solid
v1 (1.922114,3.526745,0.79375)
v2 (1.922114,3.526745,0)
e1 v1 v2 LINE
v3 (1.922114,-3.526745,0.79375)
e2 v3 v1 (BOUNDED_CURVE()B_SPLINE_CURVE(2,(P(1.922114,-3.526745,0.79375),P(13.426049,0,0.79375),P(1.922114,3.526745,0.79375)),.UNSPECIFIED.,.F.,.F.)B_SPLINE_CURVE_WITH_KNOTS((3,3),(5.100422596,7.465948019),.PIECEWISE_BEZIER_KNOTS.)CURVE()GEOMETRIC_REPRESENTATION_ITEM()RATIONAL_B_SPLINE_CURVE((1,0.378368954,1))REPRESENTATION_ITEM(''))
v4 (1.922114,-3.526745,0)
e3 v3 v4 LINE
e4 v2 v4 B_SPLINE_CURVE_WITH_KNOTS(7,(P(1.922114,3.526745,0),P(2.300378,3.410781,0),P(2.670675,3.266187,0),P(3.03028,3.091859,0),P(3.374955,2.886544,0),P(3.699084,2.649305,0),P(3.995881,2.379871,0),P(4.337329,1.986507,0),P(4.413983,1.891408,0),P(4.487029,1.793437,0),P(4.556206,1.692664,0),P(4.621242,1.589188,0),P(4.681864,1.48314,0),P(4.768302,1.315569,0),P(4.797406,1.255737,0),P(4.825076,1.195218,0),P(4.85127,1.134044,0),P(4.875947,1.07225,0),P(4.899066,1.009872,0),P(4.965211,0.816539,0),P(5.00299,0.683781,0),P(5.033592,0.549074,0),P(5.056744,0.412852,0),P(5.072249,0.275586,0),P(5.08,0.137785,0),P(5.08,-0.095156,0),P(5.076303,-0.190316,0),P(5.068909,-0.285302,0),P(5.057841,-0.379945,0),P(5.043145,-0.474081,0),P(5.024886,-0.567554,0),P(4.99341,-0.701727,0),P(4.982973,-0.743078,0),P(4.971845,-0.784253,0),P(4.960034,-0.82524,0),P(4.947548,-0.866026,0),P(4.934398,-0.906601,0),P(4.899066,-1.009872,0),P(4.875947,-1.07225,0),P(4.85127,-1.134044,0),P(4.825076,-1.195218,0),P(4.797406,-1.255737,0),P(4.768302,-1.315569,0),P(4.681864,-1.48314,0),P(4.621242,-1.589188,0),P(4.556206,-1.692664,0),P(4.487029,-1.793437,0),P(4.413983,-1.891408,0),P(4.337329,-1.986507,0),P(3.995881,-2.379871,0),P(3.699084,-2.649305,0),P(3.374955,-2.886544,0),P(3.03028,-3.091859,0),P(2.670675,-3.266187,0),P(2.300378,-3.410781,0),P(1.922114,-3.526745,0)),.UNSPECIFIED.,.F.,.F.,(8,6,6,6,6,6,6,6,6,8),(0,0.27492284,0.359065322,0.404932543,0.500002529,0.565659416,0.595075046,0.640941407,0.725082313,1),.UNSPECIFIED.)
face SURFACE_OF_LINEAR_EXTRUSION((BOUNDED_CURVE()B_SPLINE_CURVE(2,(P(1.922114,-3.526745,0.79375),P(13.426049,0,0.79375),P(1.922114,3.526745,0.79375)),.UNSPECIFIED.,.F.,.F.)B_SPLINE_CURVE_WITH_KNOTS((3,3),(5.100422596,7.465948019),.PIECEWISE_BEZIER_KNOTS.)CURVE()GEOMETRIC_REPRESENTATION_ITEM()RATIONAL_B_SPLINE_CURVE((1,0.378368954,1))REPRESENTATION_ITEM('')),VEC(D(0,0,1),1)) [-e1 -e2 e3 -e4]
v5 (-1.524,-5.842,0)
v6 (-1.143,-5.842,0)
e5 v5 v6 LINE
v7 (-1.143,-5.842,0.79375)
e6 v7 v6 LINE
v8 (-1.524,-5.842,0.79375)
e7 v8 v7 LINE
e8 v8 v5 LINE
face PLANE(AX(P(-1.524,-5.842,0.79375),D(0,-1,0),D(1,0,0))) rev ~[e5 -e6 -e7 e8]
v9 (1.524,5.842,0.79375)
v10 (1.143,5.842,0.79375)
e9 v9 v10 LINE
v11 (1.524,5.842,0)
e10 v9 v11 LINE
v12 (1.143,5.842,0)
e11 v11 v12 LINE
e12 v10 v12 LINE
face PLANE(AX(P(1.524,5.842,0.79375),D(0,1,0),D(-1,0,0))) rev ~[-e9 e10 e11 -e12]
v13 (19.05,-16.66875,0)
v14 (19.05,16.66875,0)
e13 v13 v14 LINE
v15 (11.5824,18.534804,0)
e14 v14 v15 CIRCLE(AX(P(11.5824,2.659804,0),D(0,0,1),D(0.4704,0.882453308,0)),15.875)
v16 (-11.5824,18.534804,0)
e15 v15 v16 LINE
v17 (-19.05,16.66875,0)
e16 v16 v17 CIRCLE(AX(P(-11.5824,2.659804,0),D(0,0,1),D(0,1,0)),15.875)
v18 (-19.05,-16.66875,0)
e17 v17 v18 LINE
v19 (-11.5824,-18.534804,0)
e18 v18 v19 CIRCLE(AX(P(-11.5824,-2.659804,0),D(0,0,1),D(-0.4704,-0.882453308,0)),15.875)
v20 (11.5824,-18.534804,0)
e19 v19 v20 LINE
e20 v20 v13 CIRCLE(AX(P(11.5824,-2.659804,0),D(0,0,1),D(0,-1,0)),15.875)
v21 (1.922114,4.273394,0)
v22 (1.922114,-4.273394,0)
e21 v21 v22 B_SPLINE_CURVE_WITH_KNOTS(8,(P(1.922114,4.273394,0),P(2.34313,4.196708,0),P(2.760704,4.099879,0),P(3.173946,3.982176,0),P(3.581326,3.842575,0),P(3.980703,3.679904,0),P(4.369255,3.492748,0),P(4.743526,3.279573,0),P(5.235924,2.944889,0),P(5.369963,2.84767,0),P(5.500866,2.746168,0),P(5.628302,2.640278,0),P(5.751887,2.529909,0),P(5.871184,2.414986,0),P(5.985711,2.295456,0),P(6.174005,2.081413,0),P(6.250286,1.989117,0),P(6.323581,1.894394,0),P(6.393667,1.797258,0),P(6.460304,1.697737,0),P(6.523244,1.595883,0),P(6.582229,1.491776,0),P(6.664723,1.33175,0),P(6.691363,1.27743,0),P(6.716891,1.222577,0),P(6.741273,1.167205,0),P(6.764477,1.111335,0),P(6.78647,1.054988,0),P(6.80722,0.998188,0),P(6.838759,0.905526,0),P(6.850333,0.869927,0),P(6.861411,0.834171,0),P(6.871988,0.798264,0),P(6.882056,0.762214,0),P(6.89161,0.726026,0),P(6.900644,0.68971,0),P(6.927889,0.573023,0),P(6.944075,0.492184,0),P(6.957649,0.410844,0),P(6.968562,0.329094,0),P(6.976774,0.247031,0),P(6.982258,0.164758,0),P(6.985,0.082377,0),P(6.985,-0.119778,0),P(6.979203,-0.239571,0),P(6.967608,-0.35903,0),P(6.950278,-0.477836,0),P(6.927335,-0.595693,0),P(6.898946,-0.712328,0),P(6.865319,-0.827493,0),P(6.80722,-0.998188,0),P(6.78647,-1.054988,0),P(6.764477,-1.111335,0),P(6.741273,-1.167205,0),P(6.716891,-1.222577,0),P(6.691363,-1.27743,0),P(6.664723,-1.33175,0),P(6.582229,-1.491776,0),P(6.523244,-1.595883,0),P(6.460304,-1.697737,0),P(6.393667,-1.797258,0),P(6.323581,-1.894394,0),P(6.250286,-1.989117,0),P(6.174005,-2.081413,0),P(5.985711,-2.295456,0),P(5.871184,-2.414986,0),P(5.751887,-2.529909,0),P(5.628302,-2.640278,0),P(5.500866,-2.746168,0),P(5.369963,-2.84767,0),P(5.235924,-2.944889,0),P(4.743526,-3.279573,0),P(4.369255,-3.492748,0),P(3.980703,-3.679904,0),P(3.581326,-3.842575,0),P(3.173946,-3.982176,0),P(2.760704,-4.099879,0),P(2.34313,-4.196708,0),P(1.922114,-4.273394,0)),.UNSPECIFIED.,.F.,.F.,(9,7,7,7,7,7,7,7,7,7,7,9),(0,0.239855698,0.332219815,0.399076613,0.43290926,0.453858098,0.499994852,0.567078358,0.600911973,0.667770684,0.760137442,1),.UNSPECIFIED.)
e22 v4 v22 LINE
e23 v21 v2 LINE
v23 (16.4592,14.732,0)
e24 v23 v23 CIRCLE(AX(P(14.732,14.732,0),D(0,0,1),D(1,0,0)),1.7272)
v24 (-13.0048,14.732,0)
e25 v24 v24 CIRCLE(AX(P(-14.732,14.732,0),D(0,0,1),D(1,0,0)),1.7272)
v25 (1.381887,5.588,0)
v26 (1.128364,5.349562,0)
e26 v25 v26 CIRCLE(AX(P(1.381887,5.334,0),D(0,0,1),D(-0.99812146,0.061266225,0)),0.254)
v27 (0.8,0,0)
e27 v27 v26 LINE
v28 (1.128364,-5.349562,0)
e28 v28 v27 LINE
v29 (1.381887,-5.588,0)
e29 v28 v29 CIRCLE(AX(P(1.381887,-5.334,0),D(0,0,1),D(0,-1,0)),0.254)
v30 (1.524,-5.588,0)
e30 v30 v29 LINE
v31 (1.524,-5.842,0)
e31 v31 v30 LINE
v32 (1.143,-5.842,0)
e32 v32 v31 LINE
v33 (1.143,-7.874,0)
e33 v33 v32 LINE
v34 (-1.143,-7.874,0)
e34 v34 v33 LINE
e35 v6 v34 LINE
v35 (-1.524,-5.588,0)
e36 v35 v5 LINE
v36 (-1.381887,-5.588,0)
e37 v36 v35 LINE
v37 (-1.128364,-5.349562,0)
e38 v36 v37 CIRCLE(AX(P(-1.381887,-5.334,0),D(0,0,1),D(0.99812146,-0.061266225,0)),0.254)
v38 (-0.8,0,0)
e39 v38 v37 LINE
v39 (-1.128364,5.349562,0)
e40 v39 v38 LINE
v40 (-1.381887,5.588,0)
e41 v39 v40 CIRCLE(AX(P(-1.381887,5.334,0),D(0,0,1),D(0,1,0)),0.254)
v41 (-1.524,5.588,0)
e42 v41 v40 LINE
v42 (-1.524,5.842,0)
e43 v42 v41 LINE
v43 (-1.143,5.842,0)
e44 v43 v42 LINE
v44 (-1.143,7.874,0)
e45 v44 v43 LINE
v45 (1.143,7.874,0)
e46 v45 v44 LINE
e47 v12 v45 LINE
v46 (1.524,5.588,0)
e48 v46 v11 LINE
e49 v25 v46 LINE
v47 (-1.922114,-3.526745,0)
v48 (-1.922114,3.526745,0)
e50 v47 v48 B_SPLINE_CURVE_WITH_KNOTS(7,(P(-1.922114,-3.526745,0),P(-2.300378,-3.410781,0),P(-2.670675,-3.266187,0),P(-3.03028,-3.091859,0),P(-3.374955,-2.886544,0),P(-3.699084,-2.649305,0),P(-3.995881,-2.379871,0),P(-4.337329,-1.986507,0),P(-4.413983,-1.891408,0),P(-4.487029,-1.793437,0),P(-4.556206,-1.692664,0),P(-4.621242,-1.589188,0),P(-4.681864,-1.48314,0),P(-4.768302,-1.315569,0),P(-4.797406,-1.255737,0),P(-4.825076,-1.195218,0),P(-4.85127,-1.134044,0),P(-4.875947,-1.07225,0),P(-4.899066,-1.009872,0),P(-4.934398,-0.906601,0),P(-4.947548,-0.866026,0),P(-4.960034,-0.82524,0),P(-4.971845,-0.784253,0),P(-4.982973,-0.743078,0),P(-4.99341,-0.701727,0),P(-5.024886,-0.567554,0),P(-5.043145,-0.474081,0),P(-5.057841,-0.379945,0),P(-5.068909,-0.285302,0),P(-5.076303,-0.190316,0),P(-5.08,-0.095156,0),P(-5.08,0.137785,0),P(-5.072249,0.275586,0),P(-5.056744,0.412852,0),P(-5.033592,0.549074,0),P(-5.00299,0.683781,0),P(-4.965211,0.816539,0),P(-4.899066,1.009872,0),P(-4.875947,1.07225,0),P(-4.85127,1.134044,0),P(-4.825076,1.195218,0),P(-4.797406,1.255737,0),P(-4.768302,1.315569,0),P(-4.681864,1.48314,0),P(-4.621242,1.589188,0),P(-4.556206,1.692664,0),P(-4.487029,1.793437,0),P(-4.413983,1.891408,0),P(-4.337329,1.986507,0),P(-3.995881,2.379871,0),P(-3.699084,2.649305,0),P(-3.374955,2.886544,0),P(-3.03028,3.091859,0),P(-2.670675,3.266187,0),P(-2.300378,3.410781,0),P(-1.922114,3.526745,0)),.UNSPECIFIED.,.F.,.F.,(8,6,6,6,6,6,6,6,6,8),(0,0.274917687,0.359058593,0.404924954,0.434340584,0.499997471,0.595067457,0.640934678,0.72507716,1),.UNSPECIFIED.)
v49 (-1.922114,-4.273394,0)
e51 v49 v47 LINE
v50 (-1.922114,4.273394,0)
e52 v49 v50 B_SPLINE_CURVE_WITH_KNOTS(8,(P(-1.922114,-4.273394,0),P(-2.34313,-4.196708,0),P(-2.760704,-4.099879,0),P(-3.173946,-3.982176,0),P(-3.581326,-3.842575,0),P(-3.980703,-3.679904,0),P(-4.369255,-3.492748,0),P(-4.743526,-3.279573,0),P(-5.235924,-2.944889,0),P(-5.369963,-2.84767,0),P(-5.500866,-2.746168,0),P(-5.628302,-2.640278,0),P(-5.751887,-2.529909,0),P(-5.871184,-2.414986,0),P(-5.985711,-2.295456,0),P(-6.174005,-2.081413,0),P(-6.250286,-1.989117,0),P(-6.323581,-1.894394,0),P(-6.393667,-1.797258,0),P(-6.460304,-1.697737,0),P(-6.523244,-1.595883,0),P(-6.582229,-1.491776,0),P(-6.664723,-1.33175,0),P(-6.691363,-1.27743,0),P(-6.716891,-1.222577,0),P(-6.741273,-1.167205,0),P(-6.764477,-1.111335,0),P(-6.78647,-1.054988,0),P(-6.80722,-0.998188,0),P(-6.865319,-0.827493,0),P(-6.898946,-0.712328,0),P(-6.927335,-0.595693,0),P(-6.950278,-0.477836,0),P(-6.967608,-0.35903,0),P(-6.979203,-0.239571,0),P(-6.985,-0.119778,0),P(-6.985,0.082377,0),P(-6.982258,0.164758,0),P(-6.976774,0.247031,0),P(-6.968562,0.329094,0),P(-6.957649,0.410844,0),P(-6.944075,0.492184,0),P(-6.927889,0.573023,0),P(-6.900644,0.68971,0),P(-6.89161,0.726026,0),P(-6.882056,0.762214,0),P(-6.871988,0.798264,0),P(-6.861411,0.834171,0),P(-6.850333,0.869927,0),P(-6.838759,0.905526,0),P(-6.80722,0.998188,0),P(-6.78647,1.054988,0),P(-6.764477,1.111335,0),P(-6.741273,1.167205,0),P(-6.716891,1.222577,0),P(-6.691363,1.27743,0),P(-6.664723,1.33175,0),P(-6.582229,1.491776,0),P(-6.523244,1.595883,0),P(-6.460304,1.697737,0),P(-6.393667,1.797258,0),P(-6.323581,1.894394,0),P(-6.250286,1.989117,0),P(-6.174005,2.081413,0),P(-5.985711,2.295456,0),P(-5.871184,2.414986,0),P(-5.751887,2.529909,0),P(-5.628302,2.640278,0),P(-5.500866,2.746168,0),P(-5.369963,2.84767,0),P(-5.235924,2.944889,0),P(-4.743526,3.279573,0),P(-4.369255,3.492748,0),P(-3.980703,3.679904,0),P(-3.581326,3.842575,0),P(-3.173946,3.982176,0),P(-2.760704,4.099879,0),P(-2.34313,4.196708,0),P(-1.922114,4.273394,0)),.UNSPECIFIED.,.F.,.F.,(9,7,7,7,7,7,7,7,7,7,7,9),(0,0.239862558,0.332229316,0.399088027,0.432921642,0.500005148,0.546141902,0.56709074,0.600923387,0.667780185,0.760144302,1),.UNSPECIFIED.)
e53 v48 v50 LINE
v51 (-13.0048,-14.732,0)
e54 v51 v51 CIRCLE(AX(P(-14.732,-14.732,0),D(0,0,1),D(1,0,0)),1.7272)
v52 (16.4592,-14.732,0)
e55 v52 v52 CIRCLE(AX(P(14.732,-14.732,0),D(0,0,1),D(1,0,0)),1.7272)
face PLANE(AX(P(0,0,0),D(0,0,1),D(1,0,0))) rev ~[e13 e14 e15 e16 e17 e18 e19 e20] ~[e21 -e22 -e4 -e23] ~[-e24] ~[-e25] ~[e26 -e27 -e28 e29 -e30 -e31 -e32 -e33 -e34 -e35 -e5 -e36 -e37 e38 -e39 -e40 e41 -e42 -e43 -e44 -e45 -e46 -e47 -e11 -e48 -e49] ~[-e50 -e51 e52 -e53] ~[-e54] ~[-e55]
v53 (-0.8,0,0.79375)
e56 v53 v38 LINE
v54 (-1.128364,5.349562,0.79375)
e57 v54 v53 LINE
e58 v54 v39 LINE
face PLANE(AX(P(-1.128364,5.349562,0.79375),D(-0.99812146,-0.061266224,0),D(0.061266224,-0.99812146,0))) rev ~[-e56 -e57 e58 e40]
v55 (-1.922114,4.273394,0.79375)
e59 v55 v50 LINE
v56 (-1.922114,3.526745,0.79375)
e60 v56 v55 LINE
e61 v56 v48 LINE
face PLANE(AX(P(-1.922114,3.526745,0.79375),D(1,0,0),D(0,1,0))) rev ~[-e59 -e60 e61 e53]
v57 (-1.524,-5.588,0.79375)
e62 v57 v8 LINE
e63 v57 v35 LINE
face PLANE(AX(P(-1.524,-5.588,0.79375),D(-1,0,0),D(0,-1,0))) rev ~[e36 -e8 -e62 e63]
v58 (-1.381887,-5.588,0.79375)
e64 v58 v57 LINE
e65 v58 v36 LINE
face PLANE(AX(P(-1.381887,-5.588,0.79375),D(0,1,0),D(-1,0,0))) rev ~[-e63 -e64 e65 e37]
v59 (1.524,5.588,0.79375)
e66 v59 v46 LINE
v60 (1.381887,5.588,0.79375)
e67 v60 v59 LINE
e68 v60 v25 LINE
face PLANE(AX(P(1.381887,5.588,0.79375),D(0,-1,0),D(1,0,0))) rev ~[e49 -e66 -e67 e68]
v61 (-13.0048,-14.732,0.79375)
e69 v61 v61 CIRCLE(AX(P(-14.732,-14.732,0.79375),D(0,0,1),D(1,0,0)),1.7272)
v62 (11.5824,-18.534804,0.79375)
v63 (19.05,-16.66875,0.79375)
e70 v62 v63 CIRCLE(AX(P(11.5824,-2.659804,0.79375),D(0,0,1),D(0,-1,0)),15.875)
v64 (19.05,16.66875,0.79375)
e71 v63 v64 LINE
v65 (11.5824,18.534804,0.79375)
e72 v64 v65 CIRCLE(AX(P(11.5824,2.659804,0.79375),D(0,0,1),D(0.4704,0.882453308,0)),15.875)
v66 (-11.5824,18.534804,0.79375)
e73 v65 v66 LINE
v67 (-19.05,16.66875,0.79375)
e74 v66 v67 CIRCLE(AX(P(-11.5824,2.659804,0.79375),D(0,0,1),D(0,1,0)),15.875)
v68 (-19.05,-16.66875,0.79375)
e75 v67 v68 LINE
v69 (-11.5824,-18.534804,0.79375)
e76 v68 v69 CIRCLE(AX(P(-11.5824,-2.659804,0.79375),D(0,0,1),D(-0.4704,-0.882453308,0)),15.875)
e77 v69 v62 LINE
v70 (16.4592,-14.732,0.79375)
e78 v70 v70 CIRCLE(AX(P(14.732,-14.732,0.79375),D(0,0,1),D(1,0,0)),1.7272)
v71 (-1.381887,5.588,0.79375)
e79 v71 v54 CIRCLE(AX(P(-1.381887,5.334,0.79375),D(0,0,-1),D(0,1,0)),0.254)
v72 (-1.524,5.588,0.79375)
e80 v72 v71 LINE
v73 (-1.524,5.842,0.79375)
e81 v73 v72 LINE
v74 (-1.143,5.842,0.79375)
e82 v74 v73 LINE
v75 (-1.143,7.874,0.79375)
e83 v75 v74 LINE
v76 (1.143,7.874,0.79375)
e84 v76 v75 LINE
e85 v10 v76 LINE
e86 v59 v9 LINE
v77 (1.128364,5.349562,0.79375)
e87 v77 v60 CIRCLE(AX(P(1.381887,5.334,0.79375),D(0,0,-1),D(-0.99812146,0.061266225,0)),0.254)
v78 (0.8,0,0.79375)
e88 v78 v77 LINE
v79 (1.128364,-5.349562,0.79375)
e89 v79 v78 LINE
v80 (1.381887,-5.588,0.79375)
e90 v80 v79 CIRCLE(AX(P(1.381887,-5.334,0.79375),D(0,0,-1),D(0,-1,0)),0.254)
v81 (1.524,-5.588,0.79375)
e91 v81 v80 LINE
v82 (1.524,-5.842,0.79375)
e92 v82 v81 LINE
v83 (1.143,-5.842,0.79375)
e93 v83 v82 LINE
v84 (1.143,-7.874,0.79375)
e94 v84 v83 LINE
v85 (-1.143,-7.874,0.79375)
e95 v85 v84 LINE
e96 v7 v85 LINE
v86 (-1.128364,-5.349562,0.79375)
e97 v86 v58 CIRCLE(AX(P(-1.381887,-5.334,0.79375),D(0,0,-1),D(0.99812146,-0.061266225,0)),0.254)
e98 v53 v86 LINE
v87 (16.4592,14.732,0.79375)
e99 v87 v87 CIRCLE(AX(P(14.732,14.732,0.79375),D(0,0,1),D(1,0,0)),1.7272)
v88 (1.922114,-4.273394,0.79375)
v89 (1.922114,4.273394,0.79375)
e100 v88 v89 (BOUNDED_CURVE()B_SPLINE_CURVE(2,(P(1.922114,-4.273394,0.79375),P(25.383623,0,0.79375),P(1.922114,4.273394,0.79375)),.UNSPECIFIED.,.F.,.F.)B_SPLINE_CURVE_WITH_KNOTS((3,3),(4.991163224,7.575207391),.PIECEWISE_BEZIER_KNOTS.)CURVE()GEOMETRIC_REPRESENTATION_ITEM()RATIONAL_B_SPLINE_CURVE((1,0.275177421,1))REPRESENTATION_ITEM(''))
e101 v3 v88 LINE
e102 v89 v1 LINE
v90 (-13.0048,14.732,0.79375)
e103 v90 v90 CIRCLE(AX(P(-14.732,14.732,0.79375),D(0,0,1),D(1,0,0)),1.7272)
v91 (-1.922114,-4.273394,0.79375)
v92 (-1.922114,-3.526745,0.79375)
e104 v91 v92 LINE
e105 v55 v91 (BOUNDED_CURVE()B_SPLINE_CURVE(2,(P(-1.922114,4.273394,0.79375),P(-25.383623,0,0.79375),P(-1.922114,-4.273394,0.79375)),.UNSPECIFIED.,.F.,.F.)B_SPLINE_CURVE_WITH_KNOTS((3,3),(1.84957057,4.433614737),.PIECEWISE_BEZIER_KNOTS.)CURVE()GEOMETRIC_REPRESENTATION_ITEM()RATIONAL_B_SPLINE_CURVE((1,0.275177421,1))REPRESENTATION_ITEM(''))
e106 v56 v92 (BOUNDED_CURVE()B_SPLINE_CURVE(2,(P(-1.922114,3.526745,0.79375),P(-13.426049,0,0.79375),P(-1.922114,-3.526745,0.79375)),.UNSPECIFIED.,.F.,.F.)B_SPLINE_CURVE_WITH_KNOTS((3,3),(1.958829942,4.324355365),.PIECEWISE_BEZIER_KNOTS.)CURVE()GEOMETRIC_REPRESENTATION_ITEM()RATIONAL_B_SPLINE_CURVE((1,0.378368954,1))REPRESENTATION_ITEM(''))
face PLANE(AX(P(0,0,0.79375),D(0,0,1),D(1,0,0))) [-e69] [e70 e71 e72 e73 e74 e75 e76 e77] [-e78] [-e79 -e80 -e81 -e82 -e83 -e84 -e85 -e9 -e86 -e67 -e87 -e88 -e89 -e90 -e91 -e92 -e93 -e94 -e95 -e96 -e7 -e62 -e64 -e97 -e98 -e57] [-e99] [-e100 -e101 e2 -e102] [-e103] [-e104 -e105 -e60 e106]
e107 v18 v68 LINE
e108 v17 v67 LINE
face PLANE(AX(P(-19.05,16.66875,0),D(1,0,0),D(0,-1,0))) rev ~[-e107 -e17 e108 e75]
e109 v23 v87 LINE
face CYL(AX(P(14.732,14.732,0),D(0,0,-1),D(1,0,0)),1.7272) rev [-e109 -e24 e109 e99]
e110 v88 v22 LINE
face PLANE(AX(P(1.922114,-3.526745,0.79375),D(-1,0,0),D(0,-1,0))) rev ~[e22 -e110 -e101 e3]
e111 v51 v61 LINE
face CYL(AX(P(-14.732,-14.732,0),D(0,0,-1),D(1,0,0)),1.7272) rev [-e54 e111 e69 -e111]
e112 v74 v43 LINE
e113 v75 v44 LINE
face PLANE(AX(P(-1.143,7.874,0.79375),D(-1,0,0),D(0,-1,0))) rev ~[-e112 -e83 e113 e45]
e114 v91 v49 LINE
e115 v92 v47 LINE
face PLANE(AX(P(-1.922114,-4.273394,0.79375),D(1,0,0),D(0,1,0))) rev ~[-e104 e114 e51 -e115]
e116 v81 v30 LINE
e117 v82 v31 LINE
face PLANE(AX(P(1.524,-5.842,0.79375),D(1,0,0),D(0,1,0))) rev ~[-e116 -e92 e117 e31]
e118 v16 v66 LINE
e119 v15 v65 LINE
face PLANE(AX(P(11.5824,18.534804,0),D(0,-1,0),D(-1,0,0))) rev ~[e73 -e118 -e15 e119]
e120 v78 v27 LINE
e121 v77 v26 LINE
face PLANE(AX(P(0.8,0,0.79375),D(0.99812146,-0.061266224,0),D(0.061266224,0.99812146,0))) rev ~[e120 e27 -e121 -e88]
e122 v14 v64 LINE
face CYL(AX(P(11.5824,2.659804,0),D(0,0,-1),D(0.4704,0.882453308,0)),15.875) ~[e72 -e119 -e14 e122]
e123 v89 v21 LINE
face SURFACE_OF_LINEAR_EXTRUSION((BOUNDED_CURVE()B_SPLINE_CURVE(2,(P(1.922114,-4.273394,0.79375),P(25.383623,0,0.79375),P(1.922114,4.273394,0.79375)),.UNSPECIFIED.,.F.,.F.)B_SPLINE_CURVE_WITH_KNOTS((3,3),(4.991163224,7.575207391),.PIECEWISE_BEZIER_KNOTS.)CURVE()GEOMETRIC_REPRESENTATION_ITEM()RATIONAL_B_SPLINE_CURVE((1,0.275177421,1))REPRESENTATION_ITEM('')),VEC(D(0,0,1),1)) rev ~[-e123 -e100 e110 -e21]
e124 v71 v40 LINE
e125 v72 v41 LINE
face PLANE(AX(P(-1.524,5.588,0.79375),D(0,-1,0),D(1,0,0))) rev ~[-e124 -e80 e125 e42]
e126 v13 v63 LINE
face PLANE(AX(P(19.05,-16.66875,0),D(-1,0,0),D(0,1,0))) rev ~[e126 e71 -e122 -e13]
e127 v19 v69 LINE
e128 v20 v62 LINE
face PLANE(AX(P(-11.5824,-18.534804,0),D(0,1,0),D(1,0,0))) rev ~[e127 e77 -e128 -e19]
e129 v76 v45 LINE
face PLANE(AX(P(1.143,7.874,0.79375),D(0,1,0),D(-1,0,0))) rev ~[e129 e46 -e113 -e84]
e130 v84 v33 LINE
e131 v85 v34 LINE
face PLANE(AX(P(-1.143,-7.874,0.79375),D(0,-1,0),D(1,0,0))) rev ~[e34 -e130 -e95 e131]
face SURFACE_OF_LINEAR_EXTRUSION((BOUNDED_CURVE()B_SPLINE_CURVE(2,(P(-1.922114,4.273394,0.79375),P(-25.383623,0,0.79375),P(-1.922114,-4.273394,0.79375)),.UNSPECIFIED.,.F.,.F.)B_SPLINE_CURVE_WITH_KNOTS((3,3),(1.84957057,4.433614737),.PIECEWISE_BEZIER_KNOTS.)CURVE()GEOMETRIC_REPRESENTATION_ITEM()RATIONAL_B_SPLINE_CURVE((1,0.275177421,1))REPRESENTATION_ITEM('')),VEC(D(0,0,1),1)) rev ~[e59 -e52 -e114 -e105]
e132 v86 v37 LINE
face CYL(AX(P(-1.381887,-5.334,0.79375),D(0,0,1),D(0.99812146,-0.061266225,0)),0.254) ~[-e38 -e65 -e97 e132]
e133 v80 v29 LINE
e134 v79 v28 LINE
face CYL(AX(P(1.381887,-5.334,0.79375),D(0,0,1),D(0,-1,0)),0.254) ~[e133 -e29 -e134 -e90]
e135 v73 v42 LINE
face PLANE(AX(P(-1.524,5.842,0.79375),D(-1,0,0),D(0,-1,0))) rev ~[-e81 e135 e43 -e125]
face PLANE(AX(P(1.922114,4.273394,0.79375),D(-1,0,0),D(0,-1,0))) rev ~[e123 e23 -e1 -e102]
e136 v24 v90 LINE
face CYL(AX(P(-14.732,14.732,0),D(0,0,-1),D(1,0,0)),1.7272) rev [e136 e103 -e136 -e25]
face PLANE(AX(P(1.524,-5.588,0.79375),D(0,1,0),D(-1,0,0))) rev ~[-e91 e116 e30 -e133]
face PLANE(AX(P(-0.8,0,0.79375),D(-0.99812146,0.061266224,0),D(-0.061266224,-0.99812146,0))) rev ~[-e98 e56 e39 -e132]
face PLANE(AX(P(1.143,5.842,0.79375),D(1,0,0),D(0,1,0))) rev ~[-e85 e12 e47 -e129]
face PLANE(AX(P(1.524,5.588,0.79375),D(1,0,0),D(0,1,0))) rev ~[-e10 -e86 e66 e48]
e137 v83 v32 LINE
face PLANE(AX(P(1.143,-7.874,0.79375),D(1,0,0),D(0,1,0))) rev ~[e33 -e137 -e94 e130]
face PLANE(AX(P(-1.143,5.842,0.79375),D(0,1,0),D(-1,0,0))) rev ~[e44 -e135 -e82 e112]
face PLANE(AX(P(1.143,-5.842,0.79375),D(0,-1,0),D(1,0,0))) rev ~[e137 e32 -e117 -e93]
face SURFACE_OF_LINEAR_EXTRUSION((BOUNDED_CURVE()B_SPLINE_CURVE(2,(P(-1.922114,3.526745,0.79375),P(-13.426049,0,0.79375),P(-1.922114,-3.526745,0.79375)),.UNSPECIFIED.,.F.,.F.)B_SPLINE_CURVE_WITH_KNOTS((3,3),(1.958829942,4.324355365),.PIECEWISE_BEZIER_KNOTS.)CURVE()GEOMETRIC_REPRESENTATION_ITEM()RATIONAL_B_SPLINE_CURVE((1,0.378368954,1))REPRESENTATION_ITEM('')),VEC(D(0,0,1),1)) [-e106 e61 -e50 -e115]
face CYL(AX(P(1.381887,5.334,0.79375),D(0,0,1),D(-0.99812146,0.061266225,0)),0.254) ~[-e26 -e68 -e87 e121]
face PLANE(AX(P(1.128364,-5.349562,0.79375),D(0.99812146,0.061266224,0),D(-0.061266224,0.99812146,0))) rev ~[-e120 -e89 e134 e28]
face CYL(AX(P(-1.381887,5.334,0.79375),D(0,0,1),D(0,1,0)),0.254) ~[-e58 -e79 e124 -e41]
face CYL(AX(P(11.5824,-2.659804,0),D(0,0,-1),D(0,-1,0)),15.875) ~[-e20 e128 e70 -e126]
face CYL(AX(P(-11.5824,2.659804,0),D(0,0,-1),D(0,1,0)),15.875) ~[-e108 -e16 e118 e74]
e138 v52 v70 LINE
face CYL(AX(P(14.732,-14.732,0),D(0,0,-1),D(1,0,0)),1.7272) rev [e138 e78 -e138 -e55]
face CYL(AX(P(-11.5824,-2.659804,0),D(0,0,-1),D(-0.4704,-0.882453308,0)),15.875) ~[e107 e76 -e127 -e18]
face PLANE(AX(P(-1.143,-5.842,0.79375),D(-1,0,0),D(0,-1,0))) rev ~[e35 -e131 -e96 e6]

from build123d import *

# Parameters (mm, degrees)
F0_R     = 1.7272
F1_DEPTH = 0.79375
F3_DEPTH = 25.4


# Not quite as in the source:
# - a feature names something its author has since deleted; it is built from what else it names


with BuildPart() as f1:
    # F0 (on Top) → F1 (new body)
    with BuildSketch(Plane.XY):
        with BuildLine():
            Line((-19.05, 16.66875), (-19.05, 0))
            Line((-19.05, 0), (-19.05, -16.66875))
            ThreePointArc((-19.05, -16.66875), (-15.4310103444, -18.0612265152), (-11.5824, -18.5348037427))
            Line((-11.5824, -18.5348037427), (0, -18.5348037427))
            Line((0, -18.5348037427), (11.5824, -18.5348037427))
            ThreePointArc((11.5824, -18.5348037427), (15.4310103444, -18.0612265152), (19.05, -16.66875))
            Line((19.05, -16.66875), (19.05, 0))
            Line((19.05, 0), (19.05, 16.66875))
            ThreePointArc((19.05, 16.66875), (15.4310103444, 18.0612265152), (11.5824, 18.5348037427))
            Line((11.5824, 18.5348037427), (0, 18.5348037427))
            Line((0, 18.5348037427), (-11.5824, 18.5348037427))
            ThreePointArc((-11.5824, 18.5348037427), (-15.4310103444, 18.0612265152), (-19.05, 16.66875))
        make_face()
        with Locations((-14.732, -14.732)):
            Circle(F0_R, mode=Mode.SUBTRACT)
        with Locations((14.732, -14.732)):
            Circle(F0_R, mode=Mode.SUBTRACT)
        with Locations((-14.732, 14.732)):
            Circle(F0_R, mode=Mode.SUBTRACT)
        with Locations((14.732, 14.732)):
            Circle(F0_R, mode=Mode.SUBTRACT)
    extrude(amount=F1_DEPTH)

    # F2 (on face) → F3 (cut)
    with BuildSketch(Plane.XY.offset(0.79375)):
        with BuildLine():
            Line((-1.381887138, -5.588), (-1.524, -5.588))
            Line((-1.524, -5.588), (-1.524, -5.842))
            Line((-1.524, -5.842), (-1.143, -5.842))
            Line((-1.143, -5.842), (-1.143, -7.874))
            Line((-1.143, -7.874), (0, -7.874))
            Line((0, -7.874), (1.143, -7.874))
            Line((1.143, -7.874), (1.143, -5.842))
            Line((1.143, -5.842), (1.524, -5.842))
            Line((1.524, -5.842), (1.524, -5.588))
            Line((1.524, -5.588), (1.381887138, -5.588))
            ThreePointArc((1.381887138, -5.588), (1.2078708338, -5.5190252033), (1.128364287, -5.349561621))
            Line((1.128364287, -5.349561621), (0.8, 0))
            Line((0.8, 0), (1.128364287, 5.349561621))
            ThreePointArc((1.128364287, 5.349561621), (1.2078708338, 5.5190252033), (1.381887138, 5.588))
            Line((1.381887138, 5.588), (1.524, 5.588))
            Line((1.524, 5.588), (1.524, 5.842))
            Line((1.524, 5.842), (1.143, 5.842))
            Line((1.143, 5.842), (1.143, 7.874))
            Line((1.143, 7.874), (0, 7.874))
            Line((0, 7.874), (-1.143, 7.874))
            Line((-1.143, 7.874), (-1.143, 5.842))
            Line((-1.143, 5.842), (-1.524, 5.842))
            Line((-1.524, 5.842), (-1.524, 5.588))
            Line((-1.524, 5.588), (-1.381887138, 5.588))
            ThreePointArc((-1.381887138, 5.588), (-1.2078708338, 5.5190252033), (-1.128364287, 5.349561621))
            Line((-1.128364287, 5.349561621), (-0.8, 0))
            Line((-0.8, 0), (-1.128364287, -5.349561621))
            ThreePointArc((-1.128364287, -5.349561621), (-1.2078708338, -5.5190252033), (-1.381887138, -5.588))
        make_face()
        with BuildLine():
            add(Edge.make_bspline(
                [(-1.922114287, 3.5267450469), (-13.4260486871, 0), (-1.922114287, -3.5267450469)],
                knots=[1.958829942, 1.958829942, 1.958829942, 4.3243553652, 4.3243553652, 4.3243553652], degree=2, weights=[1, 0.3783689541, 1]))
            Line((-1.922114287, 3.5267450469), (-1.922114287, 4.2733939342))
            add(Edge.make_bspline(
                [(-1.922114287, 4.2733939342), (-25.3836232991, 0), (-1.922114287, -4.2733939342)],
                knots=[1.8495705702, 1.8495705702, 1.8495705702, 4.433614737, 4.433614737, 4.433614737], degree=2, weights=[1, 0.2751774212, 1]))
            Line((-1.922114287, -4.2733939342), (-1.922114287, -3.5267450469))
        make_face()
        with BuildLine():
            Line((1.922114287, 4.2733939342), (1.922114287, 3.5267450469))
            add(Edge.make_bspline(
                [(1.922114287, -3.5267450469), (13.4260486871, 0), (1.922114287, 3.5267450469)],
                knots=[5.1004225956, 5.1004225956, 5.1004225956, 7.4659480188, 7.4659480188, 7.4659480188], degree=2, weights=[1, 0.3783689541, 1]))
            Line((1.922114287, -3.5267450469), (1.922114287, -4.2733939342))
            add(Edge.make_bspline(
                [(1.922114287, -4.2733939342), (25.3836232991, 0), (1.922114287, 4.2733939342)],
                knots=[4.9911632238, 4.9911632238, 4.9911632238, 7.5752073906, 7.5752073906, 7.5752073906], degree=2, weights=[1, 0.2751774212, 1]))
        make_face()
    extrude(amount=-F3_DEPTH, mode=Mode.SUBTRACT)


solid = f1.part
